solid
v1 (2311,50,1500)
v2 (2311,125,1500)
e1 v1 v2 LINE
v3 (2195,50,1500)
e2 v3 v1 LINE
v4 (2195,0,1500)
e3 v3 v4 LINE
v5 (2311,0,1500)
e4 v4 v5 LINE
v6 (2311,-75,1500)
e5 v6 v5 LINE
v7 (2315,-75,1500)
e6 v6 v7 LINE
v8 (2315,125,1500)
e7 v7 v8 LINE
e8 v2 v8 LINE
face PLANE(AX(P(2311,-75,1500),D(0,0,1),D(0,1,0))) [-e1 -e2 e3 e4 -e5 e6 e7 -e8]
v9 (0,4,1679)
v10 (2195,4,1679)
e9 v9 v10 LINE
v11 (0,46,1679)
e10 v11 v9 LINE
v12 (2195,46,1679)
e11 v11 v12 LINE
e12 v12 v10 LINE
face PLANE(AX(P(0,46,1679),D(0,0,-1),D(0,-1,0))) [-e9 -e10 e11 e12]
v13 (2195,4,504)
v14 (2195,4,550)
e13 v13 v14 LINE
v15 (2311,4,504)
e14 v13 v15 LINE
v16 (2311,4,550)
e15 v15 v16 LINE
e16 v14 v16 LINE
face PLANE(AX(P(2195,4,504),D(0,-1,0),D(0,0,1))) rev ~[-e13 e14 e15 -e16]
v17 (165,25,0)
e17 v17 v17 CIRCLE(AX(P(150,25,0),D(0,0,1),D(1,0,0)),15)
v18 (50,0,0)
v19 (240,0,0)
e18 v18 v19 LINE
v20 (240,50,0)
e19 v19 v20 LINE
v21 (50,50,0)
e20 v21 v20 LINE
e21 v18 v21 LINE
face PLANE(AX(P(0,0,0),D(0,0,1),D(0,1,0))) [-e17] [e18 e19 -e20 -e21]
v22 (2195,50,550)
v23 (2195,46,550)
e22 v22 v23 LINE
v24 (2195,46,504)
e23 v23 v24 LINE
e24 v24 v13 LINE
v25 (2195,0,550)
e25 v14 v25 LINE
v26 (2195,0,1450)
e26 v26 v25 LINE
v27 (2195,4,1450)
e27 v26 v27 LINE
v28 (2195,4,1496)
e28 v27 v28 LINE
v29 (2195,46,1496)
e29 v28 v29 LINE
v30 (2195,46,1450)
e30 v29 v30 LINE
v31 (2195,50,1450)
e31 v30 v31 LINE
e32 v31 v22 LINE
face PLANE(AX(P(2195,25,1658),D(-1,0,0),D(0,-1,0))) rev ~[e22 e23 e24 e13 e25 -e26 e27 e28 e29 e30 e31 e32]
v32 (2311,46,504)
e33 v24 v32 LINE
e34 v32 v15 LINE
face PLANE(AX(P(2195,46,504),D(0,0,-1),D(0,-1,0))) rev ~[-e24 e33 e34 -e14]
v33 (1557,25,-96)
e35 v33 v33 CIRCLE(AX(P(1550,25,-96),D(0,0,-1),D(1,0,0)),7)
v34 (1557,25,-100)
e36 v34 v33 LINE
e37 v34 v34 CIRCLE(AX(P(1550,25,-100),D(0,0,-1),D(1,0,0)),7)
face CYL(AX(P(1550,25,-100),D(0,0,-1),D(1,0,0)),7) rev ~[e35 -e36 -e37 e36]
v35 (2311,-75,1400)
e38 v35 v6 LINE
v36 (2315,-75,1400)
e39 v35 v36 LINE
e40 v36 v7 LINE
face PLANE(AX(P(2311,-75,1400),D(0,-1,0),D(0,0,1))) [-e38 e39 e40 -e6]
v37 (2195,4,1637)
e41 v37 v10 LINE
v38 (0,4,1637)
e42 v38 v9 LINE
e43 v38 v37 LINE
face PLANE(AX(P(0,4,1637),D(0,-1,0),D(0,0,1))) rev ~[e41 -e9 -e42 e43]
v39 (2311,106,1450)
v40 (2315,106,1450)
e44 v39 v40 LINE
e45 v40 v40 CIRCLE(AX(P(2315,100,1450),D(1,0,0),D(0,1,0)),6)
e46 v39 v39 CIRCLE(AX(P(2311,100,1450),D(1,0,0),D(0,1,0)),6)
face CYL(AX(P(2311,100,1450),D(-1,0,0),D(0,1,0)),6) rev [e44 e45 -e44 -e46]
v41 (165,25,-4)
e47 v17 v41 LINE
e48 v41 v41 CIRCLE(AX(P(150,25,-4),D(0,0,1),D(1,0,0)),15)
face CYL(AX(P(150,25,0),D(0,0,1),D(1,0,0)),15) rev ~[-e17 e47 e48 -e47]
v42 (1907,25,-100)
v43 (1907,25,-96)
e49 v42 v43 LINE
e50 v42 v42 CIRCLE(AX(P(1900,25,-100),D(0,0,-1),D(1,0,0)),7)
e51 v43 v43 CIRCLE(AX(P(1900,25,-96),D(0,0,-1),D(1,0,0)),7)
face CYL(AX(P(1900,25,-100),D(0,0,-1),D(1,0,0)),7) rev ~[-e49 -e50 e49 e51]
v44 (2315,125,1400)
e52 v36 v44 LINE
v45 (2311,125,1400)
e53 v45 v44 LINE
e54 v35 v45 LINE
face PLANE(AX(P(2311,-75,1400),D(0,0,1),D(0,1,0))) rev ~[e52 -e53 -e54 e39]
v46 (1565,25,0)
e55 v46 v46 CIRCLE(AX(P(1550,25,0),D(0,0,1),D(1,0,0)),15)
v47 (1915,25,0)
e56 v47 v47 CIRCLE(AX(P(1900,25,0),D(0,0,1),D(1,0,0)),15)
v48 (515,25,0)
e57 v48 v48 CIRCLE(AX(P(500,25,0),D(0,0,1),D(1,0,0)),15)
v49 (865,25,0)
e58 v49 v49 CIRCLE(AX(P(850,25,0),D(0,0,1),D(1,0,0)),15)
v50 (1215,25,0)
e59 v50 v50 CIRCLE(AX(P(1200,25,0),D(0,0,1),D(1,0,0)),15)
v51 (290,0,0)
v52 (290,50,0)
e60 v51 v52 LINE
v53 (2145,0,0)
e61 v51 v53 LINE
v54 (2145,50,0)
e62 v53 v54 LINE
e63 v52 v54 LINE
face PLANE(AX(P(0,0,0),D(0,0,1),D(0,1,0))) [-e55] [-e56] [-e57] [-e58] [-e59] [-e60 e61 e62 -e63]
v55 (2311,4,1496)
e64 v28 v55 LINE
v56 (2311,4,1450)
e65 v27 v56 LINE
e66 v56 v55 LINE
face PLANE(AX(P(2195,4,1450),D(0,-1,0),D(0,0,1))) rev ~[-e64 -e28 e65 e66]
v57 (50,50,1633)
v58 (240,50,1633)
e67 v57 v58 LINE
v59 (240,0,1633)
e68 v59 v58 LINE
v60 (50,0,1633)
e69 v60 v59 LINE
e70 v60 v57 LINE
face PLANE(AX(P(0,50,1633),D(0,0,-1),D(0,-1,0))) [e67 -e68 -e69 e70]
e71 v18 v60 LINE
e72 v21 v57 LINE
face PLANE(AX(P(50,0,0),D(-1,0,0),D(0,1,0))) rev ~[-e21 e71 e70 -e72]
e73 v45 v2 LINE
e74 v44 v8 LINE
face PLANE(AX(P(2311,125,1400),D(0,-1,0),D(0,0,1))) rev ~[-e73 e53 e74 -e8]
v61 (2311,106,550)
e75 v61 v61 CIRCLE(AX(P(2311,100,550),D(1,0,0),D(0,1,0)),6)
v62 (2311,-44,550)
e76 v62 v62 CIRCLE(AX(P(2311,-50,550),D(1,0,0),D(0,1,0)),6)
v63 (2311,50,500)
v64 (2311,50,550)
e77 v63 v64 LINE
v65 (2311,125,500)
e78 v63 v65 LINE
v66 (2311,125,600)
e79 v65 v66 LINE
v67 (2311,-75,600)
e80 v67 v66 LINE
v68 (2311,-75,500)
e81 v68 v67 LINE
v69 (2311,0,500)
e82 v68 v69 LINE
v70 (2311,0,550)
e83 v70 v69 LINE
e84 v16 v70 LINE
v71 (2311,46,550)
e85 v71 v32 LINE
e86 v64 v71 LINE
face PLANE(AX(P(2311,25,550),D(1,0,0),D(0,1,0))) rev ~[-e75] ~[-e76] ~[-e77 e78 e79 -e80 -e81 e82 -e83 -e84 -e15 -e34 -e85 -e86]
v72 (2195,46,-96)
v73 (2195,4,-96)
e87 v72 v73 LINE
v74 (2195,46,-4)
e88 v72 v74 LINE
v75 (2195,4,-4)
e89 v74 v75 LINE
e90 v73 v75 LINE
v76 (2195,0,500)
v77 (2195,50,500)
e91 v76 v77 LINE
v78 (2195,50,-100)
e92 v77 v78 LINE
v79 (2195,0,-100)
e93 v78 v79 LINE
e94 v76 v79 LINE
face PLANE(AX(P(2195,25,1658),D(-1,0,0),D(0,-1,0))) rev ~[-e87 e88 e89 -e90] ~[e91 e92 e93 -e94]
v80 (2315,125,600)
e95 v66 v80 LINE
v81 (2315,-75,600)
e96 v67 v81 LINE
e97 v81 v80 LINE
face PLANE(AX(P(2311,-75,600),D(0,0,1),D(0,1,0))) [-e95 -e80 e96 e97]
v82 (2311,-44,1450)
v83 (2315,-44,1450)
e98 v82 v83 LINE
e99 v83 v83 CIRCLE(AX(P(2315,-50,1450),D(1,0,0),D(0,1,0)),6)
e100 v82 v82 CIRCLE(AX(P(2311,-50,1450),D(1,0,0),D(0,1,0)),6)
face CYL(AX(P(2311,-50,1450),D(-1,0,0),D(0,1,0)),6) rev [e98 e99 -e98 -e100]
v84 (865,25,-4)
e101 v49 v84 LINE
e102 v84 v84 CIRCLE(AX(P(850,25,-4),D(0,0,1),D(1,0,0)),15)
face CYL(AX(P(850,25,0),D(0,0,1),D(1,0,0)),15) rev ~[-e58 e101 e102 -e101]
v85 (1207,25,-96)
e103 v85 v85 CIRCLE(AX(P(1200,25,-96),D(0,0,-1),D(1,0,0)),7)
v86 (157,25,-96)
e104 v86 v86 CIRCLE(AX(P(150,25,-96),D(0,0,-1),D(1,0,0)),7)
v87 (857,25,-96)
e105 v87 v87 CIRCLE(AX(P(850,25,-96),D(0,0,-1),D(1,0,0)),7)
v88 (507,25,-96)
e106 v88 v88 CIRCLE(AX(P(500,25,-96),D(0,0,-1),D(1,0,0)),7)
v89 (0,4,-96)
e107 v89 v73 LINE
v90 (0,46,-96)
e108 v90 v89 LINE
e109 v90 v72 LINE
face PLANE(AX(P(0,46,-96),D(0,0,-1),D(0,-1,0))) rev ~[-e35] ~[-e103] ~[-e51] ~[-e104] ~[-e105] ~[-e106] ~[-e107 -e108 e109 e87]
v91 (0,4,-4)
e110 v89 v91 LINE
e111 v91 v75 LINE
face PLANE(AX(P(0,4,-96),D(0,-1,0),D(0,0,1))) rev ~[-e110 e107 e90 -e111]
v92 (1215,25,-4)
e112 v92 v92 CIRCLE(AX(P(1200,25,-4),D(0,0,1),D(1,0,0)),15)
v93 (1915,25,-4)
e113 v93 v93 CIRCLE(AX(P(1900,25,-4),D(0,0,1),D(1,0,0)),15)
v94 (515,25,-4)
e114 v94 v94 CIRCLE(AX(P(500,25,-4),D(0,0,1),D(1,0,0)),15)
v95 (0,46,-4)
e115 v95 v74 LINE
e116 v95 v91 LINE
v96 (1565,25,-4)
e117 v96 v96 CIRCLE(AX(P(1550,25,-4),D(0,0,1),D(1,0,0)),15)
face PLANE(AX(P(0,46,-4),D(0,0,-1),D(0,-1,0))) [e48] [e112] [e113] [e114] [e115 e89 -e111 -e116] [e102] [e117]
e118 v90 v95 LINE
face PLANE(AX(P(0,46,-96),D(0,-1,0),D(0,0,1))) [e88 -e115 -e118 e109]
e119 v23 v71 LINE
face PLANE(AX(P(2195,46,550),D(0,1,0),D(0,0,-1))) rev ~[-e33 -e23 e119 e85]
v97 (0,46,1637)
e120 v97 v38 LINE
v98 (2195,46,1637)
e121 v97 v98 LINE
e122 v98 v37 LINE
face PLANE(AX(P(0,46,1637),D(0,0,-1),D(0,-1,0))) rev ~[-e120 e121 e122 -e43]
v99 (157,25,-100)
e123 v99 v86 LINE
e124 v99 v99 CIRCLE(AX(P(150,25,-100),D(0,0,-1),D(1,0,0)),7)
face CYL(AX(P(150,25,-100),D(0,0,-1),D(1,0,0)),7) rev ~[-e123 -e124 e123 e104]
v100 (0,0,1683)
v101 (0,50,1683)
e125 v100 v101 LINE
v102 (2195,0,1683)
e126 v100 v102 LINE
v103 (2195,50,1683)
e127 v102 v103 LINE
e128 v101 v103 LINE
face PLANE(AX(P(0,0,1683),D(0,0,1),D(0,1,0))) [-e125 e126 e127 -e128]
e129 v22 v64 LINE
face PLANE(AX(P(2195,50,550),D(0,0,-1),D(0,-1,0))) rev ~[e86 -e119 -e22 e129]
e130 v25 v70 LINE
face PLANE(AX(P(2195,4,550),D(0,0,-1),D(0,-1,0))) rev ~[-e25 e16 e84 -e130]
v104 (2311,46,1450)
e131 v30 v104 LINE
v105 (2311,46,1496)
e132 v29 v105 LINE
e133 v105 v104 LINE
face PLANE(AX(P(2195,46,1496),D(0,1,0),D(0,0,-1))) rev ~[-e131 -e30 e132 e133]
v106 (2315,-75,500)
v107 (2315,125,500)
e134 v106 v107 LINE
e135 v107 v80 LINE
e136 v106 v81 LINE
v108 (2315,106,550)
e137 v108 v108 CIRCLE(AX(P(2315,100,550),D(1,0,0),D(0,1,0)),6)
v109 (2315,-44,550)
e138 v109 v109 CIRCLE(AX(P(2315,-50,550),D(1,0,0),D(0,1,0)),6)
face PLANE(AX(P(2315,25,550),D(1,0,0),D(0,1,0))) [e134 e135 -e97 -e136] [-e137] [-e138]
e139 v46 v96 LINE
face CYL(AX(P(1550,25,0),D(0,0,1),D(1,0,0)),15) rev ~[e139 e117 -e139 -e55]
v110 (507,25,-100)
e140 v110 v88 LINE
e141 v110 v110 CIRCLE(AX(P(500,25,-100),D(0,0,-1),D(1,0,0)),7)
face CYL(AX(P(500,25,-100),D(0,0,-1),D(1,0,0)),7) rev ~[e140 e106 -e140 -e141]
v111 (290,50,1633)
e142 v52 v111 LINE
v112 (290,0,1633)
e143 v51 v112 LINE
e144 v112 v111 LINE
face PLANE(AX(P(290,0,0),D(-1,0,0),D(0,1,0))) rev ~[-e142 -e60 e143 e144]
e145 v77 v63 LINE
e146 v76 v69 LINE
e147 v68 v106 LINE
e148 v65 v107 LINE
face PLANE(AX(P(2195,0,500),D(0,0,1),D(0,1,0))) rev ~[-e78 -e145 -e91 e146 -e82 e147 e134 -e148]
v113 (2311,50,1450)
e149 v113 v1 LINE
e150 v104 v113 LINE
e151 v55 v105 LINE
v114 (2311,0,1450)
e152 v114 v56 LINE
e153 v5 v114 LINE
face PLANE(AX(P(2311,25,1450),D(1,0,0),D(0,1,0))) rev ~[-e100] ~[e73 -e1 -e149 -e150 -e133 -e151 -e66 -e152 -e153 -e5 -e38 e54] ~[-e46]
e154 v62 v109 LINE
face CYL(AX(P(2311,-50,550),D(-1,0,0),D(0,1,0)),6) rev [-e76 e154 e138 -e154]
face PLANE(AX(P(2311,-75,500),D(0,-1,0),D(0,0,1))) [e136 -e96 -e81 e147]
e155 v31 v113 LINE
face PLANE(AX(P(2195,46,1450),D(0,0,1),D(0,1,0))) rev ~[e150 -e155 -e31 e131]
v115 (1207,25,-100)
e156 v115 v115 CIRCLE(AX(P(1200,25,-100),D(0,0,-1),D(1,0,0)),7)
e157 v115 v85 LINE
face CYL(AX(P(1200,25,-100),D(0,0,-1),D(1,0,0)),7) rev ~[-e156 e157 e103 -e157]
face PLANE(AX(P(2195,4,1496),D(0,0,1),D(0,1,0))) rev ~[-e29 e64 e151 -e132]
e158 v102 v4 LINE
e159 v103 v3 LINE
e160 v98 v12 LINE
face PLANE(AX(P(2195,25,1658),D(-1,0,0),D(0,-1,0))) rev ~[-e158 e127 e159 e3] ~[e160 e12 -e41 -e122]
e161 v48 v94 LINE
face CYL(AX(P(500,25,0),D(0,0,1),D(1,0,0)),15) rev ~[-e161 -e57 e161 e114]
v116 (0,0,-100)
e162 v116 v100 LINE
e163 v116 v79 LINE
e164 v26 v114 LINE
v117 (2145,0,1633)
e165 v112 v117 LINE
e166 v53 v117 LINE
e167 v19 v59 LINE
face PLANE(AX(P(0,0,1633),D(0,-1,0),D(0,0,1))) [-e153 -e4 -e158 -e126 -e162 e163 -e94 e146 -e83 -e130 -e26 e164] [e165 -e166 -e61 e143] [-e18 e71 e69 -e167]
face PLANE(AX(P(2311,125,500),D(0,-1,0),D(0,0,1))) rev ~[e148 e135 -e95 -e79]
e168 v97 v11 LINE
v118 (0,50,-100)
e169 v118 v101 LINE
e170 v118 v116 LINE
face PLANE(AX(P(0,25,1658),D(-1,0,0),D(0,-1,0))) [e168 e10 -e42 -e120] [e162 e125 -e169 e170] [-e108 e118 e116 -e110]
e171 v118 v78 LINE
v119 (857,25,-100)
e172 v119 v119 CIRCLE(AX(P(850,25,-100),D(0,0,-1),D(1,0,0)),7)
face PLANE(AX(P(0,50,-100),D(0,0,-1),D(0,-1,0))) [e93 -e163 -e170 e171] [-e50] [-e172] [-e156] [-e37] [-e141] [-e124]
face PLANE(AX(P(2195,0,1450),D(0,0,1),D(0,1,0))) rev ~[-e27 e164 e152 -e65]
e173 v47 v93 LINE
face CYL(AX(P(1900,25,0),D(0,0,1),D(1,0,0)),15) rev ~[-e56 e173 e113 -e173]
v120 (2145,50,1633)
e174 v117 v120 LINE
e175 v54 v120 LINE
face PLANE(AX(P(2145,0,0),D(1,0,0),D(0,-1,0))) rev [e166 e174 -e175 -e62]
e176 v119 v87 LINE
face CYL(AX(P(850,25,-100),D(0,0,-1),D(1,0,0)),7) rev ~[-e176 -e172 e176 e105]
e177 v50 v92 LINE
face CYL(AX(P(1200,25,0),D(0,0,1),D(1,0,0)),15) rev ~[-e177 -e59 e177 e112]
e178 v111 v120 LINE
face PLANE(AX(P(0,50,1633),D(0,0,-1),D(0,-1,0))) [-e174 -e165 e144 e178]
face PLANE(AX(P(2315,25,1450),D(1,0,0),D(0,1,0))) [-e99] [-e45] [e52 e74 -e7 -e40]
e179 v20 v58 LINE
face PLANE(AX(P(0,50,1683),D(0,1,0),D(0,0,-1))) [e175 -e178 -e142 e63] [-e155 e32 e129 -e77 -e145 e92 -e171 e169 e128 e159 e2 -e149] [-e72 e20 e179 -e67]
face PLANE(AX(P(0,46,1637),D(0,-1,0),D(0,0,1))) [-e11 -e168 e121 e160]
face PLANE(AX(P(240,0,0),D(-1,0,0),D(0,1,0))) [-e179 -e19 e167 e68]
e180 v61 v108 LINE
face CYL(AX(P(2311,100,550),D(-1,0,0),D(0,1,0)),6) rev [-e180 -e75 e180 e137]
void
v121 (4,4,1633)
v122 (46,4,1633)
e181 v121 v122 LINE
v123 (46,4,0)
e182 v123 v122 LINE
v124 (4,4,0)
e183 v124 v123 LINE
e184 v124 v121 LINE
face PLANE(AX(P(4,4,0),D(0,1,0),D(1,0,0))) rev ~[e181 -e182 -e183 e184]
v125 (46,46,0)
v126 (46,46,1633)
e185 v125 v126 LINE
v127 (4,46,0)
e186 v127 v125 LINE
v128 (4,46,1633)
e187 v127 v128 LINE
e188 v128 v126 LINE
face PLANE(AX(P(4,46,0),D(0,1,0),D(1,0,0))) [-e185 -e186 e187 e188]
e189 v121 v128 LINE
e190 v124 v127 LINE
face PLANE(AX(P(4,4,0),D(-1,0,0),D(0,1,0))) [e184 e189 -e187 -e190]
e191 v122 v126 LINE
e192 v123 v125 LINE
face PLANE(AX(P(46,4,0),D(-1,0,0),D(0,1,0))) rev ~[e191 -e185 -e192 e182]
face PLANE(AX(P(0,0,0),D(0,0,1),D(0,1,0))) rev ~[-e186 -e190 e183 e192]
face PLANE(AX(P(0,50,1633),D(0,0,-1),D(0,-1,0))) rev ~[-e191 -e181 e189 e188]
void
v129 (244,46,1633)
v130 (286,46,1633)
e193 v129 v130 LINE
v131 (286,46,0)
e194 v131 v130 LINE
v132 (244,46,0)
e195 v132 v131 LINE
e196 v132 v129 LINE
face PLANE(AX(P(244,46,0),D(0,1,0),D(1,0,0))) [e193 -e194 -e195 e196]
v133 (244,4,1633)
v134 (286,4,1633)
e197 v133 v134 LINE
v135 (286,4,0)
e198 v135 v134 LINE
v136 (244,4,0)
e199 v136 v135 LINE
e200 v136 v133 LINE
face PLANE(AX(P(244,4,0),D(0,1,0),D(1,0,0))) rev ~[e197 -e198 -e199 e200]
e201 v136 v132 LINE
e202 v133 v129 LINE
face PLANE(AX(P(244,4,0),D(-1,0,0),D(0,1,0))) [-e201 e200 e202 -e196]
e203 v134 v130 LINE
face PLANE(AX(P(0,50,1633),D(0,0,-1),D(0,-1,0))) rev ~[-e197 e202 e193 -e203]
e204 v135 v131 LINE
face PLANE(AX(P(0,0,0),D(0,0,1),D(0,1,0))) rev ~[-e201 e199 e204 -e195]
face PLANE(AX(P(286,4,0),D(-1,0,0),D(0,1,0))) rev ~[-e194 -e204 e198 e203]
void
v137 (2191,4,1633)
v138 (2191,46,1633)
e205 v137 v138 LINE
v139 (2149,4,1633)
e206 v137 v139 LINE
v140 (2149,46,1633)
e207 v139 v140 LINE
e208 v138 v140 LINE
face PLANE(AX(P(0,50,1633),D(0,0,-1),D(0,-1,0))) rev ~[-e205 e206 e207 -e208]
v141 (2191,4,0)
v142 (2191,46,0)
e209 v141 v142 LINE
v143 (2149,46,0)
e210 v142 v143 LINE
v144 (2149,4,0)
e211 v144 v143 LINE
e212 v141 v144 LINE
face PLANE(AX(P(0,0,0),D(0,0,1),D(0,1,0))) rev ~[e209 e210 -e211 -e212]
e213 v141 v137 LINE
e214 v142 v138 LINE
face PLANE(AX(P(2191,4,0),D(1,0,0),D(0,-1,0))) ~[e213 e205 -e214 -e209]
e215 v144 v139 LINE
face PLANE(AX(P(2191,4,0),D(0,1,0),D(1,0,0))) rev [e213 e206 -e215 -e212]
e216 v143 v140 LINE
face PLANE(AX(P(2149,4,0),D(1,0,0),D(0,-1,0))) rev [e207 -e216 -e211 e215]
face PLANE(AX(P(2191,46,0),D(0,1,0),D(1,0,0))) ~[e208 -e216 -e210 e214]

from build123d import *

# Parameters (mm, degrees)
F0_W      = 42
F0_H      = 42
F1_DEPTH  = 1633
F2_W      = 42
F2_H      = 92
F3_DEPTH  = 2195
F6_W      = 42
F6_H      = 42
F7_DEPTH  = 2195
F9_DEPTH  = 116
F10_W     = 200
F10_H     = 100
F10_R     = 6
F11_DEPTH = 4
F12_W     = 50
F12_H     = 50
F12_W_2   = 42
F12_H_2   = 42
F13_DEPTH = 1633
F14_R     = 7
F15_DEPTH = 125
F16_R     = 15
F16_R_2   = 7
F17_DEPTH = 5


# Not quite as in the source:
# - a feature names something its author has since deleted; it is built from what else it names


with BuildPart() as f1:
    # F0 (on Top) → F1 (new body)
    with BuildSketch(Plane.XY):
        Polygon((0, 4), (0, 0), (50, 0), (50, 50), (0, 50), (0, 46), align=None)
        with Locations((25, 25)):
            Rectangle(F0_W, F0_H, mode=Mode.SUBTRACT)
    extrude(amount=F1_DEPTH)


with BuildPart() as f3:
    # F2 (on face) → F3 (new body)
    with BuildSketch(Plane(origin=(0, 0, 0), x_dir=(0, -1, 0), z_dir=(-1, 0, 0))):
        Polygon((0, 0), (-50, 0), (-50, -4), (-50, -96), (-50, -100), (0, -100), align=None)
        with Locations((-25, -50)):
            Rectangle(F2_W, F2_H, mode=Mode.SUBTRACT)
    extrude(amount=-F3_DEPTH)

    # F5: F1 across plane
    add(f1.part.mirror(Plane.YZ.offset(1097.5)))


with BuildPart() as f1_1:
    add(f1.part)

    add(f3.part)  # F7 merges F3
    # F6 (on face) → F7 (join, through all)
    with BuildSketch(Plane(origin=(0, 0, 0), x_dir=(0, -1, 0), z_dir=(-1, 0, 0))):
        Polygon((-46, 1683), (-50, 1683), (-50, 1633), (0, 1633), (0, 1683), (-4, 1683), align=None)
        with Locations((-25, 1658)):
            Rectangle(F6_W, F6_H, mode=Mode.SUBTRACT)
    extrude(amount=-F7_DEPTH)

    # F8 (on face) → F9 (join)
    with BuildSketch(Plane.YZ.offset(2195)):
        Polygon((4, 550), (0, 550), (0, 500), (50, 500), (50, 550), (46, 550), (46, 504), (4, 504), align=None)
        Polygon((0, 1500), (0, 1450), (4, 1450), (4, 1496), (46, 1496), (46, 1450), (50, 1450), (50, 1500), align=None)
    extrude(amount=F9_DEPTH)

    # F10 (on face) → F11 (join)
    with BuildSketch(Plane.YZ.offset(2311)):
        with Locations((25, 1450)):
            Rectangle(F10_W, F10_H)
        with Locations((-50, 1450)):
            Circle(F10_R, mode=Mode.SUBTRACT)
        with Locations((100, 1450)):
            Circle(F10_R, mode=Mode.SUBTRACT)
        with Locations((25, 550)):
            Rectangle(F10_W, F10_H)
        with Locations((-50, 550)):
            Circle(F10_R, mode=Mode.SUBTRACT)
        with Locations((100, 550)):
            Circle(F10_R, mode=Mode.SUBTRACT)
    extrude(amount=F11_DEPTH)

    # F12 (on face) → F13 (join, through all)
    with BuildSketch(Plane.XY):
        with Locations((265, 25)):
            Rectangle(F12_W, F12_H)
        with Locations((265, 25)):
            Rectangle(F12_W_2, F12_H_2, mode=Mode.SUBTRACT)
    extrude(amount=F13_DEPTH)

    # F14 (on face) → F15 (cut)
    with BuildSketch(Plane(origin=(0, 0, -100), x_dir=(1, 0, 0), z_dir=(0, 0, -1))):
        with Locations((150, -25)):
            Circle(F14_R)
        with Locations((500, -25)):
            Circle(F14_R)
        with Locations((850, -25)):
            Circle(F14_R)
        with Locations((1200, -25)):
            Circle(F14_R)
        with Locations((1550, -25)):
            Circle(F14_R)
        with Locations((1900, -25)):
            Circle(F14_R)
        with Locations((2250, -25)):
            Circle(F14_R)
    extrude(amount=-F15_DEPTH, mode=Mode.SUBTRACT)

    # F16 (on face) → F17 (cut)
    with BuildSketch(Plane.XY):
        with Locations((500, 25)):
            Circle(F16_R)
        with Locations((500, 25)):
            Circle(F16_R_2, mode=Mode.SUBTRACT)
        with Locations((850, 25)):
            Circle(F16_R)
        with Locations((850, 25)):
            Circle(F16_R_2, mode=Mode.SUBTRACT)
        with Locations((1200, 25)):
            Circle(F16_R)
        with Locations((1200, 25)):
            Circle(F16_R_2, mode=Mode.SUBTRACT)
        with Locations((1550, 25)):
            Circle(F16_R)
        with Locations((1550, 25)):
            Circle(F16_R_2, mode=Mode.SUBTRACT)
        with Locations((1900, 25)):
            Circle(F16_R)
        with Locations((1900, 25)):
            Circle(F16_R_2, mode=Mode.SUBTRACT)
        with Locations((150, 25)):
            Circle(F16_R)
    extrude(amount=-F17_DEPTH, mode=Mode.SUBTRACT)


solid = f1_1.part
